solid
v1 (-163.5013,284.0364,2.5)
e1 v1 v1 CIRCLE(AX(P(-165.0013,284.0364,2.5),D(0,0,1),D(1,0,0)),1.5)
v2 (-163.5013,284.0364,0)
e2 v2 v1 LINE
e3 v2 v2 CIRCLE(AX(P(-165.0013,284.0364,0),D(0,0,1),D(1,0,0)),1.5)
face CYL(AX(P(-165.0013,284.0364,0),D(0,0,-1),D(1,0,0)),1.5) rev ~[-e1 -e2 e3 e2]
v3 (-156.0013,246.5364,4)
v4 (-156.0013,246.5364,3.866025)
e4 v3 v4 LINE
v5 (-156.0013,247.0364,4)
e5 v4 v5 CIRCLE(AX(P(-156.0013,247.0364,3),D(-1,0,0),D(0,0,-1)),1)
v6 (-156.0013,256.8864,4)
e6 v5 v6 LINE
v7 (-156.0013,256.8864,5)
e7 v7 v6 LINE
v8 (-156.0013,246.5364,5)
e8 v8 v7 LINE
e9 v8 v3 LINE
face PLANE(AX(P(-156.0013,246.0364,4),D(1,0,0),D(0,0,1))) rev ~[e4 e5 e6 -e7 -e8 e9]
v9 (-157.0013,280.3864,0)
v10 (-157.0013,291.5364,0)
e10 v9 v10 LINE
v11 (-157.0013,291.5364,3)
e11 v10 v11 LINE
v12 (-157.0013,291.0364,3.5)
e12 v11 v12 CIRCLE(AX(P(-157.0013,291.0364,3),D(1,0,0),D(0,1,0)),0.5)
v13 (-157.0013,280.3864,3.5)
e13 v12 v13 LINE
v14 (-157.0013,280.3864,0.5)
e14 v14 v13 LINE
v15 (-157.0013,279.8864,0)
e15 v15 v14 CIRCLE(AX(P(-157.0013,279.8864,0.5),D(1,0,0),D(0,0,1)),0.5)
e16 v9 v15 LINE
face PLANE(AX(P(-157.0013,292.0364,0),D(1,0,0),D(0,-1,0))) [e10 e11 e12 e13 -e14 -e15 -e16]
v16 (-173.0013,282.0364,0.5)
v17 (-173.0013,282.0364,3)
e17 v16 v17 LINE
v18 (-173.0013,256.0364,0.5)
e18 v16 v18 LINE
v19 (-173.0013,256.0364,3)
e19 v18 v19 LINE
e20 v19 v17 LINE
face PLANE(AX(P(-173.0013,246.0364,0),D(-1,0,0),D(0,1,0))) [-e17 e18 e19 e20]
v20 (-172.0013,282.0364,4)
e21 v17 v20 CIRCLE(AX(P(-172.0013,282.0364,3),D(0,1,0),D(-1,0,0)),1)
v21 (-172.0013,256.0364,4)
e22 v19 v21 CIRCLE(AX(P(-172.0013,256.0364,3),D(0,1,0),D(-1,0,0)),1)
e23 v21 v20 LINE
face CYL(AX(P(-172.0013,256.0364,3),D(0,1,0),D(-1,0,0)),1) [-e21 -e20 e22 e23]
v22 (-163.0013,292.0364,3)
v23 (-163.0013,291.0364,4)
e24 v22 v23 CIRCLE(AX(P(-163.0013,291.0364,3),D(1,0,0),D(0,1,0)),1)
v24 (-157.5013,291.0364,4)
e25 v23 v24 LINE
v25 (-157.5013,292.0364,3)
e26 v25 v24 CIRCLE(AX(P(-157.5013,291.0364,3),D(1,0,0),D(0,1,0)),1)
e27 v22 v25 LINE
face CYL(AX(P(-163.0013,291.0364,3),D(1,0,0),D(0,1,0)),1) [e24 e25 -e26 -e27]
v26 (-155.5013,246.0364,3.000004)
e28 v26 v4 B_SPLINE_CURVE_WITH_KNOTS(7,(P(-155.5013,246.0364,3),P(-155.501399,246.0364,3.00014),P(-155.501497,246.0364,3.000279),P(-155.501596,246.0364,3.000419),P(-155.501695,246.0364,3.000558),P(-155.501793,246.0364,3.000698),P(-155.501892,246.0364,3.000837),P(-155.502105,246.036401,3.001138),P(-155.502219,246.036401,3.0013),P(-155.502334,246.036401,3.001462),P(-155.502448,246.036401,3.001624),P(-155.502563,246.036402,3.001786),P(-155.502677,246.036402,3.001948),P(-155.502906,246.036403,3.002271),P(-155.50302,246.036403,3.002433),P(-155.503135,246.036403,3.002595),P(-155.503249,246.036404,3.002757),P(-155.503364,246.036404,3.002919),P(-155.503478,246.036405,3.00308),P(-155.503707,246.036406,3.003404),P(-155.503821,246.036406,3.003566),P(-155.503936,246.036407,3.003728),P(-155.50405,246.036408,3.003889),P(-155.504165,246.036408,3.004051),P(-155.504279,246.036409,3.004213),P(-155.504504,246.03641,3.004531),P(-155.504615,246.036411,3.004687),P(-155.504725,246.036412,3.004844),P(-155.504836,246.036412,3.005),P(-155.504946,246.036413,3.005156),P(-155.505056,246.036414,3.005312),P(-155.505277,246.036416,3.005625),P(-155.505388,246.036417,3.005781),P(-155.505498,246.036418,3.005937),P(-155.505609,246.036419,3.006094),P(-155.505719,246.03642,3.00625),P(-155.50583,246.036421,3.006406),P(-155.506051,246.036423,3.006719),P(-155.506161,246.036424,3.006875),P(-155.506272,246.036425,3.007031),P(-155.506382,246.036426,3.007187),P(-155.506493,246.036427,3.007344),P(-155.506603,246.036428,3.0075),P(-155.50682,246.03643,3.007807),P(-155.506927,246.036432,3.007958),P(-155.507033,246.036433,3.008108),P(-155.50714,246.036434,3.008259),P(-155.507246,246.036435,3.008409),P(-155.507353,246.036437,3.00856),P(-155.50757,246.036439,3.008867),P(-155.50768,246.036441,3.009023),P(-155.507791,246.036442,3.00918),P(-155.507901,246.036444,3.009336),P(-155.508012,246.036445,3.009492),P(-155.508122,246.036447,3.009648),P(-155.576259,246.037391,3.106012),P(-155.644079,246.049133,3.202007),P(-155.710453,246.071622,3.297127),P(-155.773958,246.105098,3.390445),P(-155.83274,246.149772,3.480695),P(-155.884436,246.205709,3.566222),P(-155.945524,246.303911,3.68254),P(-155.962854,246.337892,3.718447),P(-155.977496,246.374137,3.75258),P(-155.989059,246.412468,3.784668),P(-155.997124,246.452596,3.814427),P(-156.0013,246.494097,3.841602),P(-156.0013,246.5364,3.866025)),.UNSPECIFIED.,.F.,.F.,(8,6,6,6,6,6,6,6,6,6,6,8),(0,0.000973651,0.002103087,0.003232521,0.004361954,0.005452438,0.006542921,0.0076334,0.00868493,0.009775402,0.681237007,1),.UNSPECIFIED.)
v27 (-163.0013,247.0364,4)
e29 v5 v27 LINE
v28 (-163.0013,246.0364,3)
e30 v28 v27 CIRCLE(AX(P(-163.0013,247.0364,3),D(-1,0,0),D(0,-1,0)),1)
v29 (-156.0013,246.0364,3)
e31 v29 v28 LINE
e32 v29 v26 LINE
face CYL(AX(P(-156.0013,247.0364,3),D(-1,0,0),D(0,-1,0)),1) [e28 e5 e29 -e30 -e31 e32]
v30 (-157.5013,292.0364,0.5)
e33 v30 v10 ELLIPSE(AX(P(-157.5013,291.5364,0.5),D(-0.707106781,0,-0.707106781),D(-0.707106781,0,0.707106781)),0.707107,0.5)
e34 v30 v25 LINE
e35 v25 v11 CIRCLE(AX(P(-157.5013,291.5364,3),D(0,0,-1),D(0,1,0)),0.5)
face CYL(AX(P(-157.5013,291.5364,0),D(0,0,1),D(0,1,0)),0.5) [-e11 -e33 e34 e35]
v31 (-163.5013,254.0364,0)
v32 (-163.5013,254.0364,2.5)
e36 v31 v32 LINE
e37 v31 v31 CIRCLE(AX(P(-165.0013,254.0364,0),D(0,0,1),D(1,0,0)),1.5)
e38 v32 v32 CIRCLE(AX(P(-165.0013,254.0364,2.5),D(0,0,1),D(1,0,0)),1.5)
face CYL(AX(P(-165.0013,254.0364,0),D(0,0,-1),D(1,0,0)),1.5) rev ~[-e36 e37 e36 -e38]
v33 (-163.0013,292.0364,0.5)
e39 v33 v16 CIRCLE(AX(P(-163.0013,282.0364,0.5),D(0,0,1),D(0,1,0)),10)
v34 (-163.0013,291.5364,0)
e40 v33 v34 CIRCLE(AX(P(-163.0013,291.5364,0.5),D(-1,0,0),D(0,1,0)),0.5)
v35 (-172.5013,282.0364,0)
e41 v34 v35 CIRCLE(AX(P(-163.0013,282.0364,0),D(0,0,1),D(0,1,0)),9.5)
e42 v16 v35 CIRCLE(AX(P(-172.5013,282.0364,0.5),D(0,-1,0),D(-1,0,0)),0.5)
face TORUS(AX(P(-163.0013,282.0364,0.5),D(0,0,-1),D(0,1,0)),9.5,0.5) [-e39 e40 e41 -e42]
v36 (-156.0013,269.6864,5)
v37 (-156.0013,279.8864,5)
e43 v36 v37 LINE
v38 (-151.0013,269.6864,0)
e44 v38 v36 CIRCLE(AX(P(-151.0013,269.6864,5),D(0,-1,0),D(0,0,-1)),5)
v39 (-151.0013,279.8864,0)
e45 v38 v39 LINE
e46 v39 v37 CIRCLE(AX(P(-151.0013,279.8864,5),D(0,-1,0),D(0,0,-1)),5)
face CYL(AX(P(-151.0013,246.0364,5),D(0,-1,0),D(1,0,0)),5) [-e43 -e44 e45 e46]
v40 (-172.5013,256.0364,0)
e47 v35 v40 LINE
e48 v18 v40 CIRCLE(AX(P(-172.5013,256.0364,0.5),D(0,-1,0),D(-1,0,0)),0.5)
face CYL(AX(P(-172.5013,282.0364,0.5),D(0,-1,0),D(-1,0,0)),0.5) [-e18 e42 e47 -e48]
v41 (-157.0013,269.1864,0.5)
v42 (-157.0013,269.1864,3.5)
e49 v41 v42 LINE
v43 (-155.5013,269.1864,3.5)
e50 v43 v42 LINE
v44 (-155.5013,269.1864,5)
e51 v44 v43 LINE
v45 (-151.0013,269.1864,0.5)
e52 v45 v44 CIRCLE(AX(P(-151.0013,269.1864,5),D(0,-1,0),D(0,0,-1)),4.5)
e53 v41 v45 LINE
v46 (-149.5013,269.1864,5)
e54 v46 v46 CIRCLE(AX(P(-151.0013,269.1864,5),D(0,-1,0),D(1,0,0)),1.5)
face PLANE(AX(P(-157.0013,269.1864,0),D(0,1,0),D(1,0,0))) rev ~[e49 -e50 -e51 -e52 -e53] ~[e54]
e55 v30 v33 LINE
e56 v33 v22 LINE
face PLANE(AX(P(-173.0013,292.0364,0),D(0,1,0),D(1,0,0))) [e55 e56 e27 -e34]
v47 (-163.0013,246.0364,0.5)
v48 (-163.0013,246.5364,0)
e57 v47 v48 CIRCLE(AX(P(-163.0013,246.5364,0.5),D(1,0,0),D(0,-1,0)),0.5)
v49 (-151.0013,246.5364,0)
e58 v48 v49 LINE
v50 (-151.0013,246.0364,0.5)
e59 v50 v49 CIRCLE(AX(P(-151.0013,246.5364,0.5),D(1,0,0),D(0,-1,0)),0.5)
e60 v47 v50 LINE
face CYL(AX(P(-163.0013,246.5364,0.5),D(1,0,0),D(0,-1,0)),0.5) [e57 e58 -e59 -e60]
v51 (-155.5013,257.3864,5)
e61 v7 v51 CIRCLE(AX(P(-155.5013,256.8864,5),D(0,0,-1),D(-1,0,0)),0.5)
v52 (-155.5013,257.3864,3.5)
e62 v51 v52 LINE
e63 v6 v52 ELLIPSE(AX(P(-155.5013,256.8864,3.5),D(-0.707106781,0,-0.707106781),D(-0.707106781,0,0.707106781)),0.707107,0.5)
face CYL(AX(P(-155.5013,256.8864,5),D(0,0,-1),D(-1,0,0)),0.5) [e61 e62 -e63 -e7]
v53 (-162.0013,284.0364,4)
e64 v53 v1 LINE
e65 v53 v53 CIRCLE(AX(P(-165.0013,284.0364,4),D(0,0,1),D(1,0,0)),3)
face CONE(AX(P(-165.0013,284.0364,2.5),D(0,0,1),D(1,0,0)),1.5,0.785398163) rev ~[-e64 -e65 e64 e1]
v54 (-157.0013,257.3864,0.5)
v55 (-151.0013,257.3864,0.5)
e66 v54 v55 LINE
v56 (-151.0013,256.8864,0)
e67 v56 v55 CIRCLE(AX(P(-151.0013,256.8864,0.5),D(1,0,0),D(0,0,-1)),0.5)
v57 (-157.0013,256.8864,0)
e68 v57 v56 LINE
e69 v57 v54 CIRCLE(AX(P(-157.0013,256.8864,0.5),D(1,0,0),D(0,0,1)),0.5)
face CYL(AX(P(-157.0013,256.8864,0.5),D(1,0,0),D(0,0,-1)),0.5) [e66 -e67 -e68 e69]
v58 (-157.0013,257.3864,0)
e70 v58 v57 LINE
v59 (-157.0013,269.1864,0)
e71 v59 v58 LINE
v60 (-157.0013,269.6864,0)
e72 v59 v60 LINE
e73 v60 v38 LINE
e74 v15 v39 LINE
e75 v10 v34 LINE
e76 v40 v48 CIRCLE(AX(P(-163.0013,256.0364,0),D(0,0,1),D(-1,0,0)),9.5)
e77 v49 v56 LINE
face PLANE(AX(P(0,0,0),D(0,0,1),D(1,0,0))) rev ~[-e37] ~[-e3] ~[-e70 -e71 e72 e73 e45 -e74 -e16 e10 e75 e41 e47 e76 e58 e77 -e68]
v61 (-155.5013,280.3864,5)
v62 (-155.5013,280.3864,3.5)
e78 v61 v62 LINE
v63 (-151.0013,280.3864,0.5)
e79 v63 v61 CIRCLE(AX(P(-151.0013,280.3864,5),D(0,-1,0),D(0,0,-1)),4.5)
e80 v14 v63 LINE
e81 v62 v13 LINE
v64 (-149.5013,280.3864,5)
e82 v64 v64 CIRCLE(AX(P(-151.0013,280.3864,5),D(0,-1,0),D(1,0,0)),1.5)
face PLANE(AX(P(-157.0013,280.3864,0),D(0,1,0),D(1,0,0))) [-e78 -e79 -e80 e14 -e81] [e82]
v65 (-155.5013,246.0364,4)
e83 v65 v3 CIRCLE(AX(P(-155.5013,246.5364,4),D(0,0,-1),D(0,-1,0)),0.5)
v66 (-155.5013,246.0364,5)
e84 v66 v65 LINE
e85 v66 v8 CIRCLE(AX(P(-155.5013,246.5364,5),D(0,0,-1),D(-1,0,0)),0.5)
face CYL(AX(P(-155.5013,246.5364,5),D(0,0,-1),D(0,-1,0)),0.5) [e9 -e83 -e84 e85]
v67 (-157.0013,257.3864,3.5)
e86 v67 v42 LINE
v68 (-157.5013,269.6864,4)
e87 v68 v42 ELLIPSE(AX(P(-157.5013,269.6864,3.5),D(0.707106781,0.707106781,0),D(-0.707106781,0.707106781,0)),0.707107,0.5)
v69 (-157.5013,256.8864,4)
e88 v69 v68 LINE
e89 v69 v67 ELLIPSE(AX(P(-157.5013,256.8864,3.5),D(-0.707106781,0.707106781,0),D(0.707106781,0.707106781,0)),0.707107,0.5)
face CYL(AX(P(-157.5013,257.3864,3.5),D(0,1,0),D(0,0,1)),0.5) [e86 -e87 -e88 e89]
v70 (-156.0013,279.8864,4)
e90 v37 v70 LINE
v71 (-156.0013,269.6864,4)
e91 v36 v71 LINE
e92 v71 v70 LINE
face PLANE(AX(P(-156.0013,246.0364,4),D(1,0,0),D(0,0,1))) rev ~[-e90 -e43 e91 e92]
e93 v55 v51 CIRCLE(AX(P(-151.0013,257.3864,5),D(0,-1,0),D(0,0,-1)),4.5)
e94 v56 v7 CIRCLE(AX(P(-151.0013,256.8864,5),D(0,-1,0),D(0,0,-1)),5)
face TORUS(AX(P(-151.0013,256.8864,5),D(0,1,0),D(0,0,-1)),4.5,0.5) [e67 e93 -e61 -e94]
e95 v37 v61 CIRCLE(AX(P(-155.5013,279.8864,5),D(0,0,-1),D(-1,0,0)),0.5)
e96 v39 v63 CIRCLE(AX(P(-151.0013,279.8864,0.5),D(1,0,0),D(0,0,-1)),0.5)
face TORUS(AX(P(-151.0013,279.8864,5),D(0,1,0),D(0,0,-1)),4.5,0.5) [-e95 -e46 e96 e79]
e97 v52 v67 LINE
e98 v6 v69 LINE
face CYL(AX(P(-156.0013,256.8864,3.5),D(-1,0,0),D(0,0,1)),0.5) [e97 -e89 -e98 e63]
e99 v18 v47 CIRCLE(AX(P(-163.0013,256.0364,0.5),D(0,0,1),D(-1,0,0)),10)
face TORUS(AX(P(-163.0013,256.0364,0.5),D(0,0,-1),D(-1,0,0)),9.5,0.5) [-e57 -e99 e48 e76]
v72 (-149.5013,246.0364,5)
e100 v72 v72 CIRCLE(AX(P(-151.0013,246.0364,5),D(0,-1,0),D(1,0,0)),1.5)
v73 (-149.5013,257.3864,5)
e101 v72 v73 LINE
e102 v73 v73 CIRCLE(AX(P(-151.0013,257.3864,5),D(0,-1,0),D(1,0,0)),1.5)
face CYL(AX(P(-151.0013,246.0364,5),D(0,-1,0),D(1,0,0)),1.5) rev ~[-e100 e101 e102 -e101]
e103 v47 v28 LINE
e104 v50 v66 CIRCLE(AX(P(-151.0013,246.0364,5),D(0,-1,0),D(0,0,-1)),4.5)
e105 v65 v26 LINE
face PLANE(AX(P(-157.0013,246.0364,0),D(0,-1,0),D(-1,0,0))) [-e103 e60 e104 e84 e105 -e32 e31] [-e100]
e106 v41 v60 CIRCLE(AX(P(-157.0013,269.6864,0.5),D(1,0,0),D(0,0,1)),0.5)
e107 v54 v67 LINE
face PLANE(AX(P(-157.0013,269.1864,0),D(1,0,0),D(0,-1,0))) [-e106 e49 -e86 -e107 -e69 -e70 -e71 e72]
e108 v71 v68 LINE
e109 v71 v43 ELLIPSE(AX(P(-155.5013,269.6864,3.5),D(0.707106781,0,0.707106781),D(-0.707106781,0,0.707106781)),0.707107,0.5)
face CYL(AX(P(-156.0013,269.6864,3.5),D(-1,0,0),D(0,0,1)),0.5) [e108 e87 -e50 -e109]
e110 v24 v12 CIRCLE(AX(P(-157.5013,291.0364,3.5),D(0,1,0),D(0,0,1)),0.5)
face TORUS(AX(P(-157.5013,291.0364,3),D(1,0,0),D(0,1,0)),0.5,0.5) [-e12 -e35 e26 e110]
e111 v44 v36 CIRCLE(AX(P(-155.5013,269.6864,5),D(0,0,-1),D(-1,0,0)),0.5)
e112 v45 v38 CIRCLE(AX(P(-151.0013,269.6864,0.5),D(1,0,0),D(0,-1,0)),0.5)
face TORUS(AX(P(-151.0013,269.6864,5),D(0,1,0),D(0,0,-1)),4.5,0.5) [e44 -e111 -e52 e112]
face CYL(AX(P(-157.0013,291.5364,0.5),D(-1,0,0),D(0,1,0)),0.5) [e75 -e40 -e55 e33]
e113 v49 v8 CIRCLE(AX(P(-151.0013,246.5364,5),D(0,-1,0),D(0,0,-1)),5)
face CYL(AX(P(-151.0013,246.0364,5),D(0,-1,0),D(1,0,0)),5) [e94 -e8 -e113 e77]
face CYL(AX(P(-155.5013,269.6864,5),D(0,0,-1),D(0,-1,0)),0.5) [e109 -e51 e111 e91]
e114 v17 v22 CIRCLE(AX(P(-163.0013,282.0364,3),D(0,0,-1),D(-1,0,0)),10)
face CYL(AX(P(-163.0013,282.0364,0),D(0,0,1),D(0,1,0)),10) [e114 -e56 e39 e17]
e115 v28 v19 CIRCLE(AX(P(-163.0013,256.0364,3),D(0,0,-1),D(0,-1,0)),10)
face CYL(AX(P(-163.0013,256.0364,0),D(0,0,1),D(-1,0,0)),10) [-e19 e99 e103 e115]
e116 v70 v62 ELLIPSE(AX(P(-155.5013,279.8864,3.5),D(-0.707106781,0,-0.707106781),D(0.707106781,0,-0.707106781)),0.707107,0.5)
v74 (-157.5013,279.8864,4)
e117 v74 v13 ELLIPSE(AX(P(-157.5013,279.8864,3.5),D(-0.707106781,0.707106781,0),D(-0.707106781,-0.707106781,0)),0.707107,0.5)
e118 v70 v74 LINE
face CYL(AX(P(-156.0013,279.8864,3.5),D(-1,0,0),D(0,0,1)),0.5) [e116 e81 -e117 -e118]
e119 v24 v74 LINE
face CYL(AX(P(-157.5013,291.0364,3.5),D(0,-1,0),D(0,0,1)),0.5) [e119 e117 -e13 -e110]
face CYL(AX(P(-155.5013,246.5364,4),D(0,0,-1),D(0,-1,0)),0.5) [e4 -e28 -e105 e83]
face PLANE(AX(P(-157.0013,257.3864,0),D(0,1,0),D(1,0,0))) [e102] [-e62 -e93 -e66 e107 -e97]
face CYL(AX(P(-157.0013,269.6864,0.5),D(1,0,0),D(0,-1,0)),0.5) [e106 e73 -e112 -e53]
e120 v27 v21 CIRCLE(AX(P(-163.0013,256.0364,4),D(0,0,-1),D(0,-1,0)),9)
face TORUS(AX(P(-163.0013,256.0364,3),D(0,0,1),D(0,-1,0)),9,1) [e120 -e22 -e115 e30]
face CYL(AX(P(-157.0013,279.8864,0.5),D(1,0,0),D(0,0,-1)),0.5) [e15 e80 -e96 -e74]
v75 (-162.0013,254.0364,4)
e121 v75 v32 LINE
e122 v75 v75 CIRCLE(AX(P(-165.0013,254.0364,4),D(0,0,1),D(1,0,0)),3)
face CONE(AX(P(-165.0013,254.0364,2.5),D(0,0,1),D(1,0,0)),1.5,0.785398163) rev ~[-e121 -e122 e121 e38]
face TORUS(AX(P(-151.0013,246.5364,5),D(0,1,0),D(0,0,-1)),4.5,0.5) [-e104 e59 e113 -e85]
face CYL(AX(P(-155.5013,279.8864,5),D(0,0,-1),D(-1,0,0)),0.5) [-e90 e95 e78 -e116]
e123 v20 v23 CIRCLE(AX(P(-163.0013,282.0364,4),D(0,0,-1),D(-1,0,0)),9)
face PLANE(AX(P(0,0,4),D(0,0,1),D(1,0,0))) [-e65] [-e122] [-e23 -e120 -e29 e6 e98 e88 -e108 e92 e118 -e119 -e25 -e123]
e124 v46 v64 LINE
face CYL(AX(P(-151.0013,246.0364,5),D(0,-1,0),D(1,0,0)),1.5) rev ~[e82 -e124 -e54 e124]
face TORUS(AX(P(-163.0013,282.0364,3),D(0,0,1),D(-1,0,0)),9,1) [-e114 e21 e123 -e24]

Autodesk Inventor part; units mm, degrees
ref_plane "YZ Plane" through (0, 0, 0) normal (1, 0, 0) x (0, 1, 0)
ref_plane "XZ Plane" through (0, 0, 0) normal (0, 1, 0) x (-1, 0, 0)
ref_plane "XY Plane" through (0, 0, 0) normal (0, 0, 1) x (1, 0, 0)
sketch "Эскиз1" plane through (0, 0, 0) normal (0, 0, 1) x (1, 0, 0)
  line L0 (-173.0013, 292.0364) -> (-157.0013, 292.0364)
  line L1 (-157.0013, 292.0364) -> (-157.0013, 246.0364)
  line L2 (-157.0013, 246.0364) -> (-173.0013, 246.0364)
  line L3 (-173.0013, 246.0364) -> (-173.0013, 292.0364)
  circle A0 centre (-165.0013, 284.0364) radius 1.5
  circle A1 centre (-165.0013, 254.0364) radius 1.5
  line L4 (-165.0013, 284.0364) -> (-165.0013, 254.0364) construction
  line L5 (-157.0013, 292.0364) -> (-145.0013, 292.0364)
  line L6 (-145.0013, 292.0364) -> (-145.0013, 280.5364)
  line L7 (-145.0013, 280.5364) -> (-157.0013, 280.5364) construction
  line L8 (-157.0013, 280.5364) -> (-157.0013, 292.0364)
  line L9 (-157.0013, 269.0364) -> (-145.0013, 269.0364) construction
  line L10 (-145.0013, 269.0364) -> (-145.0013, 257.5364)
  line L11 (-145.0013, 257.5364) -> (-157.0013, 257.5364) construction
  line L12 (-157.0013, 257.5364) -> (-157.0013, 269.0364)
  line L13 (-145.0013, 292.0364) -> (-129.0013, 292.0364)
  line L14 (-129.0013, 292.0364) -> (-129.0013, 246.0364)
  line L15 (-129.0013, 246.0364) -> (-145.0013, 246.0364)
  line L16 (-145.0013, 246.0364) -> (-145.0013, 292.0364)
  line L17 (-145.0013, 254.7807) -> (-145.0013, 246.0364)
  line L18 (-145.0013, 246.0364) -> (-157.0013, 246.0364)
  line L19 (-157.0013, 246.0364) -> (-157.0013, 254.7807)
  line L20 (-157.0013, 280.3864) -> (-145.0013, 280.3864)
  line L21 (-157.0013, 269.1864) -> (-145.0013, 269.1864)
  line L22 (-157.0013, 257.3864) -> (-145.0013, 257.3864)
  point P0 (0, 0)
  dimension "d0" = 3
  dimension "d1" = 3
  dimension "d2" = 8
  dimension "d3" = 8
  dimension "d4" = 30
  dimension "d5" = 46
  dimension "d6" = 8
  dimension "d7" = 8
  dimension "d8" = 46
  dimension "d9" = 16
  dimension "d10" = 44
  dimension "d11" = 12
  dimension "d12" = 16
  dimension "d13" = 11.5
  dimension "d14" = 11.5
  dimension "d15" = 11.5
  dimension "d16" = 11.5
  dimension "d17" = 0.15
  dimension "d18" = 0.15
  dimension "d19" = 0.15
extrude "Выдавливание1" add sketch "Эскиз1" along normal blind 4 contours L0 L1 L2 L3
extrude "Выдавливание2" add sketch "Эскиз1" along normal blind 10 contours L1 L22 L16 L18 | L20 L16 L21 L1
sketch "Эскиз2" plane through (-173.0013, 246.0364, 0) normal (0, -1, 0) x (1, 0, 0)
  line L0 (28, 0) -> (16, 0) projected
  line L1 (22, 0) -> (22, 10) construction
  circle A0 centre (22, 5) radius 1.5
  line L2 (16, 10) -> (28, 10) projected
  circle A1 centre (22, 5) radius 5
  line L3 (28, 10) -> (16, 10) projected
  line L4 (22, 10) -> (28, 10)
  line L5 (28, 0) -> (28, 10) projected
  line L6 (28, 10) -> (28, 0)
  line L7 (28, 0) -> (22, 0)
  line L8 (16, 0) -> (28, 0) projected
  arc A2 (22, 0) -> (22, 10) centre (22, 5) ccw
  line L9 (0, 4) -> (16, 4) projected
  line L10 (16, 4) -> (17, 4)
  line L11 (17, 4) -> (17, 5)
  line L12 (16, 4) -> (16, 10) projected
  line L13 (16, 4) -> (16, 10)
  arc A3 (22, 10) -> (17, 5) centre (22, 5) ccw
  line L14 (16, 10) -> (22, 10)
  line L15 (16, 10) -> (28, 10) projected
  point P0 (173.0013, 0)
  dimension "d24" = 3
extrude "Выдавливание3" cut sketch "Эскиз2" against normal blind 50 contours L0 A1 L2 L5 | L11 L10 L12 L2 A1
extrude "Выдавливание4" cut sketch "Эскиз2" against normal blind 50 contours A0
fillet "Сопряжение1" radius 10 2 edges at (-173.0013, 292.0364, 2) (-173.0013, 246.0364, 2)
fillet "Сопряжение2" radius 1 5 edges at (-160.0013, 292.0364, 4) (-173.0013, 269.0364, 4) (-170.0724, 248.9654, 4) (-159.5013, 246.0364, 4) (-170.0724, 289.1075, 4)
fillet "Сопряжение3" radius 0.5 24 edges at (-157.0013, 291.7435, 3.7071) (-157.0013, 292.0364, 1.5) (-157.0013, 285.7114, 4) (-154.0013, 280.3864, 0) (-156.0013, 280.3864, 4.5) (-147.4658, 280.3864, 8.5355) (-156.5013, 269.1864, 4) (-156.0013, 269.1864, 4.5) (-154.0013, 269.1864, 0) (-147.4658, 269.1864, 8.5355) (-157.0013, 263.2864, 4) (-156.5013, 257.3864, 4) (-154.0013, 257.3864, 0) (-156.0013, 257.3864, 4.5) (-147.4658, 257.3864, 8.5355) (-156.0013, 246.0364, 3.5) (-156.0013, 246.0364, 4.5) (-157.0013, 246.0364, 0) (-170.0724, 248.9654, 0) (-173.0013, 269.0364, 0) (-170.0724, 289.1075, 0) (-160.0013, 292.0364, 0) (-147.4658, 246.0364, 8.5355) (-156.5013, 280.3864, 4)
chamfer "Фаска1" distance 1.5 angle 45 2 edges at (-166.5013, 254.0364, 4) (-166.5013, 284.0364, 4)
properties part number "петля"
